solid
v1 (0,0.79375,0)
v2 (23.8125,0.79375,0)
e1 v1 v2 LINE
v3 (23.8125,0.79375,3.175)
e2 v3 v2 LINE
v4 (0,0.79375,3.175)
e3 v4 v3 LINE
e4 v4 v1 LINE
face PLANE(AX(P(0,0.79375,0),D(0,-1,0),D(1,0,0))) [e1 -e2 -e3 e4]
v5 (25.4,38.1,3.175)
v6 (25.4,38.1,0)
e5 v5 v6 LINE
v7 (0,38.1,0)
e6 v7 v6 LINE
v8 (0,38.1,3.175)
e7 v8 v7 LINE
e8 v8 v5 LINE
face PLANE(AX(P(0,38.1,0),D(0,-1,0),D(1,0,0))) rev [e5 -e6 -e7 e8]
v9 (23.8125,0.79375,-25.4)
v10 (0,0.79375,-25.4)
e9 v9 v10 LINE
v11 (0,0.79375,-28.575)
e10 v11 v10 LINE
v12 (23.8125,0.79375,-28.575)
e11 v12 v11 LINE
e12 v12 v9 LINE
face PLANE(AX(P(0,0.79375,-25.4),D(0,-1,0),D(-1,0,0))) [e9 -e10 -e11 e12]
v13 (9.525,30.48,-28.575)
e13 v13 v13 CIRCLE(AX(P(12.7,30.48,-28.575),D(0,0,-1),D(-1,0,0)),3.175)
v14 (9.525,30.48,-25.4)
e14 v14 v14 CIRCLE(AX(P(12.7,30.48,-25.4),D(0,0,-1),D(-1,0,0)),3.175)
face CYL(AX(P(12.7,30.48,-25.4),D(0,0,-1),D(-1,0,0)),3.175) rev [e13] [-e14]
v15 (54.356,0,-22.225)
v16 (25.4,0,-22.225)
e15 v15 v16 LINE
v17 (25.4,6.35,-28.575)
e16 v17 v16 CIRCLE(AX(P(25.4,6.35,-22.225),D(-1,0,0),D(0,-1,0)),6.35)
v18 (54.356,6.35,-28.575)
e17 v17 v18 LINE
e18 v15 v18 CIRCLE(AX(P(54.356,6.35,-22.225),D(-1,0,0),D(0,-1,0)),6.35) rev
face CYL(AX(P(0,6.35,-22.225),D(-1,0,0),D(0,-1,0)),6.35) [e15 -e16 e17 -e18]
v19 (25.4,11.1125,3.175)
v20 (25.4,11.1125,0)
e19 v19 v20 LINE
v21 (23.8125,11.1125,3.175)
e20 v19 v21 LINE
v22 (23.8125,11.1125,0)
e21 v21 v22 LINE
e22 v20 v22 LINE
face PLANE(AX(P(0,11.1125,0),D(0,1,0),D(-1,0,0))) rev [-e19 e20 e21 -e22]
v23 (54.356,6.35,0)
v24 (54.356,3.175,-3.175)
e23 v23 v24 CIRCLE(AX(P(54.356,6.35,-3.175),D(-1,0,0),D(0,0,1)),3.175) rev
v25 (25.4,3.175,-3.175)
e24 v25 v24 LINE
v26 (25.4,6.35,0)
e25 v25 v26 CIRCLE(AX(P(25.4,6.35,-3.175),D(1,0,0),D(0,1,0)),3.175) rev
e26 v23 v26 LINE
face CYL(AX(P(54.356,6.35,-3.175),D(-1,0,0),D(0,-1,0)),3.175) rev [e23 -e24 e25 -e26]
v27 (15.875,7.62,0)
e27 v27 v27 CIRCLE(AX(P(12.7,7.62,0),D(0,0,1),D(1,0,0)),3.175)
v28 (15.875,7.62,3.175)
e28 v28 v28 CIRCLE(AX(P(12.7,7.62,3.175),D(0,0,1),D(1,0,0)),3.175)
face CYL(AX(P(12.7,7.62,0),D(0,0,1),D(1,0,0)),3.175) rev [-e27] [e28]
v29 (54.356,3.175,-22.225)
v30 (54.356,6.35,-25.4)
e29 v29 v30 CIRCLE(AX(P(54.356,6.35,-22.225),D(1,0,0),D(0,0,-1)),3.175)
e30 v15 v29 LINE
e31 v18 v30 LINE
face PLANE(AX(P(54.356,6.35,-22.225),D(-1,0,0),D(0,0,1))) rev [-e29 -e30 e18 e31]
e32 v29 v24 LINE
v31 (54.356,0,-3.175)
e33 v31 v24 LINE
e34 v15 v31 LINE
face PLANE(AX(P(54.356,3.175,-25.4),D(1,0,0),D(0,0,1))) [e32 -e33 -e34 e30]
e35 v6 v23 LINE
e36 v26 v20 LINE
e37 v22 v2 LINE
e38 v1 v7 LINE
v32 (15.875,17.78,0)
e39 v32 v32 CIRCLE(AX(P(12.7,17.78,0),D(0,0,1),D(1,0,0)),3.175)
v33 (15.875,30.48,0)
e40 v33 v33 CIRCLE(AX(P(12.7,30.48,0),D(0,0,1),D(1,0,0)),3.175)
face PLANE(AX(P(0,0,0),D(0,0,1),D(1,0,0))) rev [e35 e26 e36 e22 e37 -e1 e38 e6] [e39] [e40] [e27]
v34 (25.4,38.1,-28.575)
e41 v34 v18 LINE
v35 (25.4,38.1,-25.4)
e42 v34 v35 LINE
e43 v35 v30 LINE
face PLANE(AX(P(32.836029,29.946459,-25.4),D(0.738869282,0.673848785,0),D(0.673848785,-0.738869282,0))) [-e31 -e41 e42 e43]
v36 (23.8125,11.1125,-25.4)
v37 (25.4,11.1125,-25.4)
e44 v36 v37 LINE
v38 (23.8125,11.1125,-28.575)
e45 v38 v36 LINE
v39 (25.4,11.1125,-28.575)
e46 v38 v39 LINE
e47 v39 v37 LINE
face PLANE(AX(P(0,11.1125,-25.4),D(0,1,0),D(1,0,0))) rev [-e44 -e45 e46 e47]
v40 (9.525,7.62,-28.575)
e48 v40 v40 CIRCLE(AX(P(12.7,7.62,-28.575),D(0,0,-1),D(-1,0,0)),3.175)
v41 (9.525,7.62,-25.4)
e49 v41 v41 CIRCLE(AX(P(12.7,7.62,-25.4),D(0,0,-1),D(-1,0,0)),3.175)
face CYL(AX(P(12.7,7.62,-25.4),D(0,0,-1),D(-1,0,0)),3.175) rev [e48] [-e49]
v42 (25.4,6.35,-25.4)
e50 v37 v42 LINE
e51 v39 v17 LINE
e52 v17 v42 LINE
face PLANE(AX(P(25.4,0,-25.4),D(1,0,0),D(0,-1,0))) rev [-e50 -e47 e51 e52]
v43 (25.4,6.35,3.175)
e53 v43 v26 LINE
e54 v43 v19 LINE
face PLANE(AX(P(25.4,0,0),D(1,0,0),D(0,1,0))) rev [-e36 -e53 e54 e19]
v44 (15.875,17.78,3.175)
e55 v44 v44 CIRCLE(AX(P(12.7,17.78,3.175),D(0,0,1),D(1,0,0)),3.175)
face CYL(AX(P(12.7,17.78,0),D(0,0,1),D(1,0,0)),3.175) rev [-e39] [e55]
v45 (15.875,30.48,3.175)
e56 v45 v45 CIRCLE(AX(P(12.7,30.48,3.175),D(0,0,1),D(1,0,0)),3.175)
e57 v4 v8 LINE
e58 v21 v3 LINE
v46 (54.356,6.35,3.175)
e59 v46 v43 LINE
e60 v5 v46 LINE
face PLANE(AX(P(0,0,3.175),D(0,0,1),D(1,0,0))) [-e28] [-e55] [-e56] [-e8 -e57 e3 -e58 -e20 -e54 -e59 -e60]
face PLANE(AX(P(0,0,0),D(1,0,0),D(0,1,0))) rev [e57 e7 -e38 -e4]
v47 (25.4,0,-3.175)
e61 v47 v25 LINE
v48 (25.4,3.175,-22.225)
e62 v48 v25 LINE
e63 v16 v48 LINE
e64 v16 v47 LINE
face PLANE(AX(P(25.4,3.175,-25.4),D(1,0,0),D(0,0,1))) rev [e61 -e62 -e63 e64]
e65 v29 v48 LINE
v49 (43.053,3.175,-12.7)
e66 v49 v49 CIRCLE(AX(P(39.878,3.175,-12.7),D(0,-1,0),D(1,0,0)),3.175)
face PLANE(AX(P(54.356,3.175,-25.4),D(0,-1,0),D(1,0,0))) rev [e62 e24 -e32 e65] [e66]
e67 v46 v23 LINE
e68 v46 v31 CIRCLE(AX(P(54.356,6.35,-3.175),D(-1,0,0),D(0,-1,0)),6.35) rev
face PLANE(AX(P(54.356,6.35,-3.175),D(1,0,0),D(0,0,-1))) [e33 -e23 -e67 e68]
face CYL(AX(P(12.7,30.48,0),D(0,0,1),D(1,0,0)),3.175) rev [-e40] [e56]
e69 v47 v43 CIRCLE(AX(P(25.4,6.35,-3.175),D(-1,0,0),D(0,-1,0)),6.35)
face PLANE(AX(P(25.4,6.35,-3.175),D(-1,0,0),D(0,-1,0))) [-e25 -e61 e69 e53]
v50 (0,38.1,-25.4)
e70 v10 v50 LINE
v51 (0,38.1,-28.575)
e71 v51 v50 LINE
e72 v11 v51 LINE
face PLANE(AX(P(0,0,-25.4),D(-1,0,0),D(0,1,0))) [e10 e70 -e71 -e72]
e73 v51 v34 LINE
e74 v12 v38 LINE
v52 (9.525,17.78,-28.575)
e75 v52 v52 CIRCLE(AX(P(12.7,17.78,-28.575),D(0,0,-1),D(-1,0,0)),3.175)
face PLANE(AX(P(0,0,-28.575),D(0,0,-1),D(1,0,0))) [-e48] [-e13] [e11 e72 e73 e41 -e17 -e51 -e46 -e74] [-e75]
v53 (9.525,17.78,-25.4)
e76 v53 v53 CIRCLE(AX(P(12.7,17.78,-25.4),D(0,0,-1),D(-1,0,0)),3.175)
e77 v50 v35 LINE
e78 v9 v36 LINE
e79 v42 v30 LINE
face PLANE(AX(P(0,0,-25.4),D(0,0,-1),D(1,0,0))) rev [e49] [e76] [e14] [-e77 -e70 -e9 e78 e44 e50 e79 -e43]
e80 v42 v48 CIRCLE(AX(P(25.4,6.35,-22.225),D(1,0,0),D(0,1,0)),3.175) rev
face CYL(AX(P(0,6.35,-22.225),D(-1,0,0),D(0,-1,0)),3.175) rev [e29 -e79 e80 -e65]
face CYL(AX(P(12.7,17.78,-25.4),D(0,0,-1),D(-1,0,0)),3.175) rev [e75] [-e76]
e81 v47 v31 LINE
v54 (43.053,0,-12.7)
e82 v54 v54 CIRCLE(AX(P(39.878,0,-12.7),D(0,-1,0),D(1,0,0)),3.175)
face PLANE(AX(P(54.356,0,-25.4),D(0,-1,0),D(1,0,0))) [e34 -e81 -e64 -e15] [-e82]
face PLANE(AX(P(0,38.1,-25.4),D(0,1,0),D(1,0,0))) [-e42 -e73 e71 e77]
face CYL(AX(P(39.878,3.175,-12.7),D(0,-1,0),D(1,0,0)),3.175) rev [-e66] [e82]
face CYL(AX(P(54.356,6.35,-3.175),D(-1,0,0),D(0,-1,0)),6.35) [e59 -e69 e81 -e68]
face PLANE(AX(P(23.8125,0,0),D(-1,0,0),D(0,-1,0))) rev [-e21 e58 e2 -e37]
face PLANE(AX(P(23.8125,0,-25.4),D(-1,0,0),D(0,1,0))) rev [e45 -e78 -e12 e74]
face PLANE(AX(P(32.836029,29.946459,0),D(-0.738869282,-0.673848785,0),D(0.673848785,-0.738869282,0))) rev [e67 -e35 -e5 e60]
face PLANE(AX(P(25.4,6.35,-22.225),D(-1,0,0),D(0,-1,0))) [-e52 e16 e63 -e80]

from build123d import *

# Parameters (mm, degrees)
BOSS_EXTRUDE1_DEPTH     = 3.175
SKETCH2_W               = 28.956
SKETCH2_H               = 3.175
BOSS_EXTRUDE2_DEPTH     = 25.4
CUT_EXTRUDE1_DEPTH      = 74.581568589
CUT_EXTRUDE1_DEPTH_BACK = 74.581568589
SKETCH3_R               = 3.175
CUT_EXTRUDE2_DEPTH      = 71.646025975
CUT_EXTRUDE2_DEPTH_BACK = 71.646025975
SKETCH6_R               = 3.175
CUT_EXTRUDE3_DEPTH      = 74.581568589
CUT_EXTRUDE3_DEPTH_BACK = 74.581568589
SKETCH7_W               = 25.4
SKETCH7_H               = 0.79375
CONVERT_SOLID1_START    = 23.8125
CONVERT_SOLID1_DEPTH    = 30.5435
CONVERT_SOLID1_2_DEPTH  = 1.5875
CONVERT_SOLID1_START_2  = 25.4
CONVERT_SOLID1_3_DEPTH  = 28.956


# Read off the part's stored shape, not the designer's step: Convert-Solid1
with BuildPart() as part:
    # Sketch1 → Boss-Extrude1 (new body)
    with BuildSketch(Plane.XY):
        Polygon((54.356, 6.35), (25.4, 38.1), (0, 38.1), (0, 0), (54.356, 0), align=None)
    boss_extrude1 = extrude(amount=BOSS_EXTRUDE1_DEPTH)

    # Sketch2 → Boss-Extrude2 (add)
    with BuildSketch(Plane(origin=(0, 0, 0), x_dir=(-1, 0, 0), z_dir=(0, 0, -1))):
        with Locations((-39.878, 1.5875)):
            Rectangle(SKETCH2_W, SKETCH2_H)
    extrude(amount=BOSS_EXTRUDE2_DEPTH)

    # Mirror1: Boss-Extrude1 across plane
    add(boss_extrude1.mirror(Plane.XY.offset(-12.7)))

    # Sketch3 → Cut-Extrude1 (cut, two sides: drawn at the far end of the back side and taken through both)
    with BuildSketch(Plane.XY.offset(3.175).offset(-CUT_EXTRUDE1_DEPTH_BACK)):
        with Locations((12.7, 7.62)):
            Circle(SKETCH3_R)
        with Locations((12.7, 17.78)):
            Circle(SKETCH3_R)
        with Locations((12.7, 30.48)):
            Circle(SKETCH3_R)
    extrude(amount=CUT_EXTRUDE1_DEPTH + CUT_EXTRUDE1_DEPTH_BACK, mode=Mode.SUBTRACT)

    # Sketch6 → Cut-Extrude2 (cut, two sides: drawn at the far end of the back side and taken through both)
    with BuildSketch(Plane(origin=(0, 3.175, 0), x_dir=(1, 0, 0), z_dir=(0, 1, 0)).offset(-CUT_EXTRUDE2_DEPTH_BACK)):
        with Locations(Location((39.878, 12.7, 0), (0, 0, 270))):
            Circle(SKETCH6_R)
    extrude(amount=CUT_EXTRUDE2_DEPTH + CUT_EXTRUDE2_DEPTH_BACK, mode=Mode.SUBTRACT)

    # Sketch7 → Cut-Extrude3 (cut, two sides: drawn at the far end of the back side and taken through both)
    with BuildSketch(Plane(origin=(0, 0, -28.575), x_dir=(-1, 0, 0), z_dir=(0, 0, -1)).offset(-CUT_EXTRUDE3_DEPTH_BACK)):
        with Locations((-12.7, 0.396875)):
            Rectangle(SKETCH7_W, SKETCH7_H)
    extrude(amount=CUT_EXTRUDE3_DEPTH + CUT_EXTRUDE3_DEPTH_BACK, mode=Mode.SUBTRACT)

    # Convert-Solid1 outline → Convert-Solid1 (cut)
    with BuildSketch(Plane.YZ.offset(CONVERT_SOLID1_START)):
        with BuildLine():
            Line((0, -28.575), (6.35, -28.575))
            ThreePointArc((6.35, -28.575), (3.174999999, -27.724261314), (0.850738685, -25.4))
            ThreePointArc((0.850738685, -25.4), (0.216371003, -23.868500936), (0, -22.225))
            Line((0, -22.225), (0, -28.575))
        make_face()
        with BuildLine():
            Line((0, 3.175), (0, -3.175))
            ThreePointArc((0, -3.175), (0.216371003, -1.531499064), (0.850738685, 0))
            ThreePointArc((0.850738685, 0), (3.174999999, 2.324261314), (6.35, 3.175))
            Line((6.35, 3.175), (0, 3.175))
        make_face()
    extrude(amount=CONVERT_SOLID1_DEPTH, mode=Mode.SUBTRACT)

    # Convert-Solid1 2 outline → Convert-Solid1 2 (cut)
    with BuildSketch(Plane.YZ.offset(CONVERT_SOLID1_START)):
        with BuildLine():
            Line((6.35, -28.575), (11.1125, -28.575))
            Line((11.1125, -28.575), (11.1125, -25.4))
            Line((11.1125, -25.4), (0.850738685, -25.4))
            ThreePointArc((0.850738685, -25.4), (3.174999999, -27.724261314), (6.35, -28.575))
        make_face()
        with BuildLine():
            Line((0.850738685, 0), (11.1125, 0))
            Line((11.1125, 0), (11.1125, 3.175))
            Line((11.1125, 3.175), (6.35, 3.175))
            ThreePointArc((6.35, 3.175), (3.174999999, 2.324261314), (0.850738685, 0))
        make_face()
    extrude(amount=CONVERT_SOLID1_2_DEPTH, mode=Mode.SUBTRACT)

    # Convert-Solid1 3 outline → Convert-Solid1 3 (add)
    with BuildSketch(Plane.YZ.offset(CONVERT_SOLID1_START_2)):
        with BuildLine():
            Line((3.175, -25.4), (6.35, -25.4))
            ThreePointArc((6.35, -25.4), (4.10493597, -24.47006403), (3.175, -22.225))
            Line((3.175, -22.225), (3.175, -25.4))
        make_face()
        with BuildLine():
            Line((3.175, 0), (3.175, -3.175))
            ThreePointArc((3.175, -3.175), (4.10493597, -0.92993597), (6.35, 0))
            Line((6.35, 0), (3.175, 0))
        make_face()
    extrude(amount=CONVERT_SOLID1_3_DEPTH)


solid = part.part
